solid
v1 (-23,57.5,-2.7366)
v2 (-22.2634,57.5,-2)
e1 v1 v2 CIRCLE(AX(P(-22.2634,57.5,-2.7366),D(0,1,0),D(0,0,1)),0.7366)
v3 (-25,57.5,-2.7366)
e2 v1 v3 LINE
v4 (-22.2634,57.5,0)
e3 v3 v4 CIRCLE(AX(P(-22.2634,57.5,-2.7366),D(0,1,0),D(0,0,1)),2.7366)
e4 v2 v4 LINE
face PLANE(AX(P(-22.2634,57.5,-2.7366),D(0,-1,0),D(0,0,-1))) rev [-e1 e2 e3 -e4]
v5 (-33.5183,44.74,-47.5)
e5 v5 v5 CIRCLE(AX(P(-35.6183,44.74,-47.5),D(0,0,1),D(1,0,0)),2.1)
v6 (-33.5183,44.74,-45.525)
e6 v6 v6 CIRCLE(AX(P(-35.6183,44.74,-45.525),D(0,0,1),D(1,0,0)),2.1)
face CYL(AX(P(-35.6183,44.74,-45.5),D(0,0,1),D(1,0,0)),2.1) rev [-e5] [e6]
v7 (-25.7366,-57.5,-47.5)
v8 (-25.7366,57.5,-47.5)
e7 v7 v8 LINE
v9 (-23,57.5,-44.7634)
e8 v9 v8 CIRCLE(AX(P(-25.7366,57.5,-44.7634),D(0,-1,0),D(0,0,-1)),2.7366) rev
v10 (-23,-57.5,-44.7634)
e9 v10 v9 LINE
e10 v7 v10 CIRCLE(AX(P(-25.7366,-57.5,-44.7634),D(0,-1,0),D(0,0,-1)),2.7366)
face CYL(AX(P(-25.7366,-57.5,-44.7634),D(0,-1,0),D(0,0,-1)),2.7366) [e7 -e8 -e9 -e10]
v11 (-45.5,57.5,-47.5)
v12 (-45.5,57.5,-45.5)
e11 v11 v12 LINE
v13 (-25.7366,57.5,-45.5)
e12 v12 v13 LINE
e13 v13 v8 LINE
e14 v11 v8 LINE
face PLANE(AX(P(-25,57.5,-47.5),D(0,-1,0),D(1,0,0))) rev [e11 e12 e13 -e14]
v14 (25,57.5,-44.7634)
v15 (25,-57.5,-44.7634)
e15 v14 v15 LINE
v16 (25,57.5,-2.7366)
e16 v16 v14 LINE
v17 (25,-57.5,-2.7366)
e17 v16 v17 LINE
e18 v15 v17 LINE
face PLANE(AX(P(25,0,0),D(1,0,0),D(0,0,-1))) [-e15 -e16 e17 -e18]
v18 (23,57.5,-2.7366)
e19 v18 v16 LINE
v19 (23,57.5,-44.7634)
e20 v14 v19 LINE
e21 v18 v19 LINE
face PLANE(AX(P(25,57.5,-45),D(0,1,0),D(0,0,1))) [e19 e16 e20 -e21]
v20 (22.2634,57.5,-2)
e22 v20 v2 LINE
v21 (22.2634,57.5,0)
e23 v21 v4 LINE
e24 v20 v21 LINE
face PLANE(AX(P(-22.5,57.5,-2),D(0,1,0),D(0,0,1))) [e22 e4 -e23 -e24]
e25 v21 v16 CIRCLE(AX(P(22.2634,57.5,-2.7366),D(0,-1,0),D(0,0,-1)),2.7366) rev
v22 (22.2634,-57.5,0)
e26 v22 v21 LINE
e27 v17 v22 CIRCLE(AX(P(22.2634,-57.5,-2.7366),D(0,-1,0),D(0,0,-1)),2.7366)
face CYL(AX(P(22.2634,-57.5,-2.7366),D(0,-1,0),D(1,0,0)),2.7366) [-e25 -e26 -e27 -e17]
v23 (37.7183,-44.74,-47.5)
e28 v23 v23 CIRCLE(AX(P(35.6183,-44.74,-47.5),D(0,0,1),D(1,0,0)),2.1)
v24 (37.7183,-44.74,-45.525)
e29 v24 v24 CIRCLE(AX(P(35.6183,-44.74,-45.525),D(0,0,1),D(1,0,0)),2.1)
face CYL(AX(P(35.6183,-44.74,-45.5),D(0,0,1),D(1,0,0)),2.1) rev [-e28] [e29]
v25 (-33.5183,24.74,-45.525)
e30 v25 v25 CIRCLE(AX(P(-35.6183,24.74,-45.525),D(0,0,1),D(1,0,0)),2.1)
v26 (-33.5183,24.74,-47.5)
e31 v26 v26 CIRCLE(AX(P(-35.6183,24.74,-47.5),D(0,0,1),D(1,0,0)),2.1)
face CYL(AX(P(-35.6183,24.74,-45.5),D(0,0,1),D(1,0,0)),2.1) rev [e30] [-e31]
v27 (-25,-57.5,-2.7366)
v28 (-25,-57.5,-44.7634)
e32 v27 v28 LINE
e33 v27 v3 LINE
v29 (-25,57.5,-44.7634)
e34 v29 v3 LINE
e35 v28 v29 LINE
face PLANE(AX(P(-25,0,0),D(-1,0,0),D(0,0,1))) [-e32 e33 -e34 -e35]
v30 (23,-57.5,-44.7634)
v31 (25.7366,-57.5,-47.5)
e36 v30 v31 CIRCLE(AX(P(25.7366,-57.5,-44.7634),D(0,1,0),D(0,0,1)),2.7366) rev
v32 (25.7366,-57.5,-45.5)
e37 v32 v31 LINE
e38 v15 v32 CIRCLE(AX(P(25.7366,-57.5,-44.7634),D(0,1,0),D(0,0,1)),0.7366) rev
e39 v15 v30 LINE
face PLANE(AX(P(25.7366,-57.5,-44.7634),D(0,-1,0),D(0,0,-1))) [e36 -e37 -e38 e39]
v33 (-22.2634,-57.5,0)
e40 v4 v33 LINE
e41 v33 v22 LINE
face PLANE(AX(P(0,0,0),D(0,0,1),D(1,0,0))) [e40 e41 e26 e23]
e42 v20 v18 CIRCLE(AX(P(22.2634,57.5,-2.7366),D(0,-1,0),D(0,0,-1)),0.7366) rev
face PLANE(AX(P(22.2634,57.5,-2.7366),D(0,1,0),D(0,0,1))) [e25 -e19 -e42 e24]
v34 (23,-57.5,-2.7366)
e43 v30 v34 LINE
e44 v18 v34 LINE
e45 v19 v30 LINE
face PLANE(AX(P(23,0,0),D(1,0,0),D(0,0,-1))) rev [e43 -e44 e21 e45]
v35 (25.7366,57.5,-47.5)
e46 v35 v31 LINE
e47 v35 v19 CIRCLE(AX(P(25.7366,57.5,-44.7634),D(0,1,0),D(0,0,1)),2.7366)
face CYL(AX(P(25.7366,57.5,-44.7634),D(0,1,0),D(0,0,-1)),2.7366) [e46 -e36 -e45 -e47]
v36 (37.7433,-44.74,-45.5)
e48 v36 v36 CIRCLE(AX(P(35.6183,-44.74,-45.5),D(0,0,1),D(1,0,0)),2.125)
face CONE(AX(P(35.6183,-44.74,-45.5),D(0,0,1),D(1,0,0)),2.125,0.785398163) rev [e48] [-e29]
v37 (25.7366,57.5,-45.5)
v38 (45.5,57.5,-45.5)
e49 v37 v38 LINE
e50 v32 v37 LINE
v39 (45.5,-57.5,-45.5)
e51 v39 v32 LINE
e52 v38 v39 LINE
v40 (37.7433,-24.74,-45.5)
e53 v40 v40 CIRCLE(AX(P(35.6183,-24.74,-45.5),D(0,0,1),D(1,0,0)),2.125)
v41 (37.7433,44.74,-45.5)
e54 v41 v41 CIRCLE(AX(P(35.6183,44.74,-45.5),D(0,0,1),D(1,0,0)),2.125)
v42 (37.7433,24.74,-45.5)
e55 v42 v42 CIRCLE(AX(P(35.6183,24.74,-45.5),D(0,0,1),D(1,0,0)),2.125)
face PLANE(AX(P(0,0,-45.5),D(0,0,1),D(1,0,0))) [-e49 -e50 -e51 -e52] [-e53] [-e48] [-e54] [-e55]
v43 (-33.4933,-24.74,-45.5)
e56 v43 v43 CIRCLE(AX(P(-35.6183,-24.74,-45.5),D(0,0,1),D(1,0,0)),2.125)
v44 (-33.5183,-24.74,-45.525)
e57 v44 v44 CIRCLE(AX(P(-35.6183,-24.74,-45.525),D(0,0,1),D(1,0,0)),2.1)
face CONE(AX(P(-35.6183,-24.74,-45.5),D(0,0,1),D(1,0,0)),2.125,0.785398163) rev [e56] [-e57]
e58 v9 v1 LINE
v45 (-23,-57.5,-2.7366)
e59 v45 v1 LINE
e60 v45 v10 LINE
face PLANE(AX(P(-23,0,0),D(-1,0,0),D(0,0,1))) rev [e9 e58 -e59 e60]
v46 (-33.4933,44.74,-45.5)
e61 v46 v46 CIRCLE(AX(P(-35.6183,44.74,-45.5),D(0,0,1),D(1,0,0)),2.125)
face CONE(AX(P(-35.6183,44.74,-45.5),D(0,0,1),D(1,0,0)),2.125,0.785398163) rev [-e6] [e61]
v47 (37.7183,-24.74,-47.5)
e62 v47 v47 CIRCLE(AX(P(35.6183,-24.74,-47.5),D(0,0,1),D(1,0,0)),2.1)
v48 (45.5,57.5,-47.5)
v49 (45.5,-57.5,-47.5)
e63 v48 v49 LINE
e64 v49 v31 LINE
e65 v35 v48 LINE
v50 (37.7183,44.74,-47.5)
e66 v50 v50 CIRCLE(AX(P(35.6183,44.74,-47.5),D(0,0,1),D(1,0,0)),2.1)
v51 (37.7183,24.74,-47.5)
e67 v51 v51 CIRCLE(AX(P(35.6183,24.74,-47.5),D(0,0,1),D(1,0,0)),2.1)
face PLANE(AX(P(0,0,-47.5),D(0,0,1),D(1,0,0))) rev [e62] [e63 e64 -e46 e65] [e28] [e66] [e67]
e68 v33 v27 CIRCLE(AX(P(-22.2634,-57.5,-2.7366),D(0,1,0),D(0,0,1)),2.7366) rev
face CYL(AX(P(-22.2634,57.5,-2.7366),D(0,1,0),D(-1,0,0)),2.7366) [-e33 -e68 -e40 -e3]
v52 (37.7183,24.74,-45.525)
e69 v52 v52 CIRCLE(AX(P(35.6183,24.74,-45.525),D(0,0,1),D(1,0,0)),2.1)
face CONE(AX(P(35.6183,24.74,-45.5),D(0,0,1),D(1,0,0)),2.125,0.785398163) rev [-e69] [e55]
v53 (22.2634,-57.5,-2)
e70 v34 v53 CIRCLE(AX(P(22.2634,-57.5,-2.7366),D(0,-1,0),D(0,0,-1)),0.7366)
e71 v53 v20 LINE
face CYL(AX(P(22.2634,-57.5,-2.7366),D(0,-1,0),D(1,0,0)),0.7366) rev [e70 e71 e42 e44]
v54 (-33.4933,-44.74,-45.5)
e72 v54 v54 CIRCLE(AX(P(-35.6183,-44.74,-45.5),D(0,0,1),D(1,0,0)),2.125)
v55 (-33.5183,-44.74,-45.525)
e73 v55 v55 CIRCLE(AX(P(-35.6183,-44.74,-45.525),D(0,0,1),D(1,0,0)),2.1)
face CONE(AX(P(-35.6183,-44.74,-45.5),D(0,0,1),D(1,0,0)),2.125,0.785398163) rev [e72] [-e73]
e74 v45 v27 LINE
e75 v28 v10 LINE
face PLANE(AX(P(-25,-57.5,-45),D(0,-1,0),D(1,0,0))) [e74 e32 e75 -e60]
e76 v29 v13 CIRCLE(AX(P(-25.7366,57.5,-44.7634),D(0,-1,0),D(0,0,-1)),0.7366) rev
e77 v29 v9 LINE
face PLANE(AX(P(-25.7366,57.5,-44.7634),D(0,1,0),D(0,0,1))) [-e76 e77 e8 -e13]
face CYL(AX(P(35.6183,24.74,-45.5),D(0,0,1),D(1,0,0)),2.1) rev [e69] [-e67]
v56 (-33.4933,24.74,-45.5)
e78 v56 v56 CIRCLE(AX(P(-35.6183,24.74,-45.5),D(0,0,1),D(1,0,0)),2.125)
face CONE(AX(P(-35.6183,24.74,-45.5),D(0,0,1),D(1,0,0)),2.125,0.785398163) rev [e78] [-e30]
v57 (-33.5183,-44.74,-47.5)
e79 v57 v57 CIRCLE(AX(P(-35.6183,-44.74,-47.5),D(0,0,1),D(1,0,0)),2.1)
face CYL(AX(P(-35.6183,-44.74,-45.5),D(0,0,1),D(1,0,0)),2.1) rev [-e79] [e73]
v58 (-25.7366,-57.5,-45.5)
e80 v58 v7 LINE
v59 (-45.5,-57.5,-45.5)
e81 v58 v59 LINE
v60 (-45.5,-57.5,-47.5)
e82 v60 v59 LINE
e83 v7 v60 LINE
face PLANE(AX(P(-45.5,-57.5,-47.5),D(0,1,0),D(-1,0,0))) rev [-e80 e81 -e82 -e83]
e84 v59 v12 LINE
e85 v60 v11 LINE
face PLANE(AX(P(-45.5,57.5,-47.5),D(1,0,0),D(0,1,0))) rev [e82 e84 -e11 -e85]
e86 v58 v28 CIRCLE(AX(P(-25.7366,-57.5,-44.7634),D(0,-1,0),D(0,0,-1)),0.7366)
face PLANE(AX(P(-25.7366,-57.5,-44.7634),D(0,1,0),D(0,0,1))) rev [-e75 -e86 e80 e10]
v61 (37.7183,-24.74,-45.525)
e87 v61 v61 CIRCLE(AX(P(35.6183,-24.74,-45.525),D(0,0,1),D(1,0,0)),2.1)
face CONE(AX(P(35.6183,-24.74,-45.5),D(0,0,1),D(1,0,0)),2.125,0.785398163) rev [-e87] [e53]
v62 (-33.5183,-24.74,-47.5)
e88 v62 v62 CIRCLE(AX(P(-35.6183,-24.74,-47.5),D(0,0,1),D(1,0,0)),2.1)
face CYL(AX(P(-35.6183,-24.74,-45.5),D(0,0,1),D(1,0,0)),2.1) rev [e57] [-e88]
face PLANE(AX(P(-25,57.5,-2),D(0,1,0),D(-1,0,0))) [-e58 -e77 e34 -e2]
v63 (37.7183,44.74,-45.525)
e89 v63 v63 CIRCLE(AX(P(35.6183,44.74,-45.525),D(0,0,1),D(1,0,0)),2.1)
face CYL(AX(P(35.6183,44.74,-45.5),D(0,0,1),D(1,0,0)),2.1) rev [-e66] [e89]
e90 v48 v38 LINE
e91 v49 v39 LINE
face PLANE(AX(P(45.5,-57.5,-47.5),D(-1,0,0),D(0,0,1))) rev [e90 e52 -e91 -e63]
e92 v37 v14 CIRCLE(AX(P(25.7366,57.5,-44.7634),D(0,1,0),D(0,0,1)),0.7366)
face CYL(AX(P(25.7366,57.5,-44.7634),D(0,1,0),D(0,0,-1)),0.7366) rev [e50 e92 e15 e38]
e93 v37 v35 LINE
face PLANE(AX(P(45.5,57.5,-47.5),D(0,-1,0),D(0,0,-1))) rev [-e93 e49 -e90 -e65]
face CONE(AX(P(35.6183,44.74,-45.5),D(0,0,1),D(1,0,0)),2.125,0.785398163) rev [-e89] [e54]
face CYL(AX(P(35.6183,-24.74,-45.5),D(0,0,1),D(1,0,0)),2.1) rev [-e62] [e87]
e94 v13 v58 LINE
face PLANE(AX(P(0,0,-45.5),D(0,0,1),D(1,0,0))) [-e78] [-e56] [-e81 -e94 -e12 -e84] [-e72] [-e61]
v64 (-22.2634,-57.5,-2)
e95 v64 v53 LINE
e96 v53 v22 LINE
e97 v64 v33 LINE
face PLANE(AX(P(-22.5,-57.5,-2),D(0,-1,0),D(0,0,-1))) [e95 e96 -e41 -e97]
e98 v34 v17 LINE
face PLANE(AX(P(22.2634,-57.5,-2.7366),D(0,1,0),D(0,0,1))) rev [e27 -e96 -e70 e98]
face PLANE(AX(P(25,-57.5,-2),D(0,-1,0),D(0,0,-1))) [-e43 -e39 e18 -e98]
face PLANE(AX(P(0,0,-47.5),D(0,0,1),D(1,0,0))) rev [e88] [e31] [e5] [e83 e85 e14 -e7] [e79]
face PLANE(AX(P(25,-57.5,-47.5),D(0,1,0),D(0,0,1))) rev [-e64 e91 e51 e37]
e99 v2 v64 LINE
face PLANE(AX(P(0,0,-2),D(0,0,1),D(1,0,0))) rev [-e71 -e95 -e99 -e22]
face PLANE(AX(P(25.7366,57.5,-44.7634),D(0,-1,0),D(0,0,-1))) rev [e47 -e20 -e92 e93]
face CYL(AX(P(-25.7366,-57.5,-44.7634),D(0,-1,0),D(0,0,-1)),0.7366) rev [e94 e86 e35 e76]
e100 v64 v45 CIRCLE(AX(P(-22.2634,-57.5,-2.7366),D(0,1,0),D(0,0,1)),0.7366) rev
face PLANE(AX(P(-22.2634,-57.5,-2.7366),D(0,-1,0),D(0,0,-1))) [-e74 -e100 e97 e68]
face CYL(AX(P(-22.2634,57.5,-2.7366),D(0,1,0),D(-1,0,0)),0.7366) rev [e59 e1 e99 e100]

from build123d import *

# Parameters (mm, degrees)
SKETCH1_W                        = 45
SKETCH1_H                        = 115
BASE_FLANGE1_DEPTH               = 2
EDGE_FLANGE1_STRIP_W             = 9.9732
EDGE_FLANGE1_STRIP_H             = 2
EDGE_FLANGE1_STRIP_CUT_DEPTH     = 115
EDGE_FLANGE1_DEPTH               = 115
EDGE_FLANGE2_STRIP_W             = 9.9732
EDGE_FLANGE2_STRIP_H             = 2
EDGE_FLANGE2_STRIP_CUT_DEPTH     = 115
EDGE_FLANGE2_DEPTH               = 115
EDGE_FLANGE3_STRIP_W             = 9.9732
EDGE_FLANGE3_STRIP_H             = 2
EDGE_FLANGE3_STRIP_CUT_DEPTH     = 115
EDGE_FLANGE3_DEPTH               = 115
EDGE_FLANGE4_STRIP_W             = 9.9732
EDGE_FLANGE4_STRIP_H             = 2
EDGE_FLANGE4_STRIP_CUT_DEPTH     = 115
EDGE_FLANGE4_DEPTH               = 115
TAP_DRILL_FOR_M5_TAP1_AT_2_COUNT = 2
TAP_DRILL_FOR_M5_TAP1_AT_2_PITCH = 20
TAP_DRILL_FOR_M5_TAP1_AT_3_COUNT = 2
TAP_DRILL_FOR_M5_TAP1_AT_3_PITCH = 69.48
TAP_DRILL_FOR_M5_TAP1_AT_4_COUNT = 2
TAP_DRILL_FOR_M5_TAP1_AT_4_PITCH = 89.48
TAP_DRILL_FOR_M5_TAP1_AT_5_COUNT = 2
TAP_DRILL_FOR_M5_TAP1_AT_5_PITCH = 114.373614001
TAP_DRILL_FOR_M5_TAP1_AT_6_COUNT = 2
TAP_DRILL_FOR_M5_TAP1_AT_6_PITCH = 99.509414527
TAP_DRILL_FOR_M5_TAP1_AT_7_COUNT = 2
TAP_DRILL_FOR_M5_TAP1_AT_7_PITCH = 73.990899302
TAP_DRILL_FOR_M5_TAP1_AT_8_COUNT = 2
TAP_DRILL_FOR_M5_TAP1_AT_8_PITCH = 71.2366


# Sheet-metal steps are written as plain solids
with BuildPart() as part:
    # Sketch1 → Base-Flange1 (new body)
    with BuildSketch(Plane.XY):
        Rectangle(SKETCH1_W, SKETCH1_H)
    extrude(amount=-BASE_FLANGE1_DEPTH)

    # Edge-Flange1 strip (across the edge) → Edge-Flange1 strip cut (cut)
    with BuildSketch(Plane(origin=(23, 57.5, -2), x_dir=(-1, 0, 0), z_dir=(0, -1, 0))):
        with Locations((-4.25, -1)):
            Rectangle(EDGE_FLANGE1_STRIP_W, EDGE_FLANGE1_STRIP_H)
    extrude(amount=EDGE_FLANGE1_STRIP_CUT_DEPTH, mode=Mode.SUBTRACT)

    # Edge-Flange1 section (across the edge) → Edge-Flange1 (add)
    with BuildSketch(Plane(origin=(23, 57.5, -2), x_dir=(-1, 0, 0), z_dir=(0, -1, 0))):
        with BuildLine():
            Line((-2, 0.7366), (-2, 43))
            Line((-2, 43), (0, 43))
            Line((0, 43), (0, 0.7366))
            ThreePointArc((0, 0.7366), (0.215745145, 0.215745145), (0.7366, 0))
            Line((0.7366, 0), (0.7366, -2))
            ThreePointArc((0.7366, -2), (-1.198468417, -1.198468417), (-2, 0.7366))
        make_face()
    extrude(amount=EDGE_FLANGE1_DEPTH)

    # Edge-Flange2 strip (across the edge) → Edge-Flange2 strip cut (cut)
    with BuildSketch(Plane(origin=(25, -57.5, -45.5), x_dir=(0, 0, 1), z_dir=(0, 1, 0))):
        with Locations((-4.25, -1)):
            Rectangle(EDGE_FLANGE2_STRIP_W, EDGE_FLANGE2_STRIP_H)
    extrude(amount=EDGE_FLANGE2_STRIP_CUT_DEPTH, mode=Mode.SUBTRACT)

    # Edge-Flange2 section (across the edge) → Edge-Flange2 (add)
    with BuildSketch(Plane(origin=(25, -57.5, -45.5), x_dir=(0, 0, 1), z_dir=(0, 1, 0))):
        with BuildLine():
            Line((-2, 0.7366), (-2, 20.5))
            Line((-2, 20.5), (0, 20.5))
            Line((0, 20.5), (0, 0.7366))
            ThreePointArc((0, 0.7366), (0.215745145, 0.215745145), (0.7366, 0))
            Line((0.7366, 0), (0.7366, -2))
            ThreePointArc((0.7366, -2), (-1.198468417, -1.198468417), (-2, 0.7366))
        make_face()
    extrude(amount=EDGE_FLANGE2_DEPTH)

    # Edge-Flange3 strip (across the edge) → Edge-Flange3 strip cut (cut)
    with BuildSketch(Plane(origin=(-23, -57.5, -2), x_dir=(1, 0, 0), z_dir=(0, 1, 0))):
        with Locations((-4.25, -1)):
            Rectangle(EDGE_FLANGE3_STRIP_W, EDGE_FLANGE3_STRIP_H)
    extrude(amount=EDGE_FLANGE3_STRIP_CUT_DEPTH, mode=Mode.SUBTRACT)

    # Edge-Flange3 section (across the edge) → Edge-Flange3 (add)
    with BuildSketch(Plane(origin=(-23, -57.5, -2), x_dir=(1, 0, 0), z_dir=(0, 1, 0))):
        with BuildLine():
            Line((-2, 0.7366), (-2, 43))
            Line((-2, 43), (0, 43))
            Line((0, 43), (0, 0.7366))
            ThreePointArc((0, 0.7366), (0.215745145, 0.215745145), (0.7366, 0))
            Line((0.7366, 0), (0.7366, -2))
            ThreePointArc((0.7366, -2), (-1.198468417, -1.198468417), (-2, 0.7366))
        make_face()
    extrude(amount=EDGE_FLANGE3_DEPTH)

    # Edge-Flange4 strip (across the edge) → Edge-Flange4 strip cut (cut)
    with BuildSketch(Plane(origin=(-25, 57.5, -45.5), x_dir=(0, 0, 1), z_dir=(0, -1, 0))):
        with Locations((-4.25, -1)):
            Rectangle(EDGE_FLANGE4_STRIP_W, EDGE_FLANGE4_STRIP_H)
    extrude(amount=EDGE_FLANGE4_STRIP_CUT_DEPTH, mode=Mode.SUBTRACT)

    # Edge-Flange4 section (across the edge) → Edge-Flange4 (add)
    with BuildSketch(Plane(origin=(-25, 57.5, -45.5), x_dir=(0, 0, 1), z_dir=(0, -1, 0))):
        with BuildLine():
            Line((-2, 0.7366), (-2, 20.5))
            Line((-2, 20.5), (0, 20.5))
            Line((0, 20.5), (0, 0.7366))
            ThreePointArc((0, 0.7366), (0.215745145, 0.215745145), (0.7366, 0))
            Line((0.7366, 0), (0.7366, -2))
            ThreePointArc((0.7366, -2), (-1.198468417, -1.198468417), (-2, 0.7366))
        make_face()
    extrude(amount=EDGE_FLANGE4_DEPTH)

    # Sketch21 → Tap Drill for M5 Tap1 (revolve, cut)
    with BuildSketch(Plane(origin=(-35.6183, 44.74, -45.5), x_dir=(0, -1, 0), z_dir=(1, 0, 0))):
        Polygon((0, 0), (0, 2), (2.1, 2), (2.1, 0.025), (2.125, 0), align=None)
    tap_drill_for_m5_tap1 = revolve(axis=Axis((-35.6183, 44.74, -39.15), (0, 0, -1)), mode=Mode.SUBTRACT)

    # Tap Drill for M5 Tap1 at 2: Tap Drill for M5 Tap1 ×2
    with Locations(*[(0, -i * TAP_DRILL_FOR_M5_TAP1_AT_2_PITCH, 0) for i in range(1, TAP_DRILL_FOR_M5_TAP1_AT_2_COUNT)]):
        add(tap_drill_for_m5_tap1, mode=Mode.SUBTRACT)

    # Tap Drill for M5 Tap1 at 3: Tap Drill for M5 Tap1 ×2
    with Locations(*[(0, -i * TAP_DRILL_FOR_M5_TAP1_AT_3_PITCH, 0) for i in range(1, TAP_DRILL_FOR_M5_TAP1_AT_3_COUNT)]):
        add(tap_drill_for_m5_tap1, mode=Mode.SUBTRACT)

    # Tap Drill for M5 Tap1 at 4: Tap Drill for M5 Tap1 ×2
    with Locations(*[(0, -i * TAP_DRILL_FOR_M5_TAP1_AT_4_PITCH, 0) for i in range(1, TAP_DRILL_FOR_M5_TAP1_AT_4_COUNT)]):
        add(tap_drill_for_m5_tap1, mode=Mode.SUBTRACT)

    # Tap Drill for M5 Tap1 at 5: Tap Drill for M5 Tap1 ×2
    with Locations(*[Vector(0.622841208809067, -0.7823482783321378, 0) * (i * TAP_DRILL_FOR_M5_TAP1_AT_5_PITCH) for i in range(1, TAP_DRILL_FOR_M5_TAP1_AT_5_COUNT)]):
        add(tap_drill_for_m5_tap1, mode=Mode.SUBTRACT)

    # Tap Drill for M5 Tap1 at 6: Tap Drill for M5 Tap1 ×2
    with Locations(*[Vector(0.7158779934382821, -0.6982253923417416, 0) * (i * TAP_DRILL_FOR_M5_TAP1_AT_6_PITCH) for i in range(1, TAP_DRILL_FOR_M5_TAP1_AT_6_COUNT)]):
        add(tap_drill_for_m5_tap1, mode=Mode.SUBTRACT)

    # Tap Drill for M5 Tap1 at 7: Tap Drill for M5 Tap1 ×2
    with Locations(*[Vector(0.9627751611583101, -0.27030351284544973, 0) * (i * TAP_DRILL_FOR_M5_TAP1_AT_7_PITCH) for i in range(1, TAP_DRILL_FOR_M5_TAP1_AT_7_COUNT)]):
        add(tap_drill_for_m5_tap1, mode=Mode.SUBTRACT)

    # Tap Drill for M5 Tap1 at 8: Tap Drill for M5 Tap1 ×2
    with Locations(*[(i * TAP_DRILL_FOR_M5_TAP1_AT_8_PITCH, 0, 0) for i in range(1, TAP_DRILL_FOR_M5_TAP1_AT_8_COUNT)]):
        add(tap_drill_for_m5_tap1, mode=Mode.SUBTRACT)


solid = part.part
